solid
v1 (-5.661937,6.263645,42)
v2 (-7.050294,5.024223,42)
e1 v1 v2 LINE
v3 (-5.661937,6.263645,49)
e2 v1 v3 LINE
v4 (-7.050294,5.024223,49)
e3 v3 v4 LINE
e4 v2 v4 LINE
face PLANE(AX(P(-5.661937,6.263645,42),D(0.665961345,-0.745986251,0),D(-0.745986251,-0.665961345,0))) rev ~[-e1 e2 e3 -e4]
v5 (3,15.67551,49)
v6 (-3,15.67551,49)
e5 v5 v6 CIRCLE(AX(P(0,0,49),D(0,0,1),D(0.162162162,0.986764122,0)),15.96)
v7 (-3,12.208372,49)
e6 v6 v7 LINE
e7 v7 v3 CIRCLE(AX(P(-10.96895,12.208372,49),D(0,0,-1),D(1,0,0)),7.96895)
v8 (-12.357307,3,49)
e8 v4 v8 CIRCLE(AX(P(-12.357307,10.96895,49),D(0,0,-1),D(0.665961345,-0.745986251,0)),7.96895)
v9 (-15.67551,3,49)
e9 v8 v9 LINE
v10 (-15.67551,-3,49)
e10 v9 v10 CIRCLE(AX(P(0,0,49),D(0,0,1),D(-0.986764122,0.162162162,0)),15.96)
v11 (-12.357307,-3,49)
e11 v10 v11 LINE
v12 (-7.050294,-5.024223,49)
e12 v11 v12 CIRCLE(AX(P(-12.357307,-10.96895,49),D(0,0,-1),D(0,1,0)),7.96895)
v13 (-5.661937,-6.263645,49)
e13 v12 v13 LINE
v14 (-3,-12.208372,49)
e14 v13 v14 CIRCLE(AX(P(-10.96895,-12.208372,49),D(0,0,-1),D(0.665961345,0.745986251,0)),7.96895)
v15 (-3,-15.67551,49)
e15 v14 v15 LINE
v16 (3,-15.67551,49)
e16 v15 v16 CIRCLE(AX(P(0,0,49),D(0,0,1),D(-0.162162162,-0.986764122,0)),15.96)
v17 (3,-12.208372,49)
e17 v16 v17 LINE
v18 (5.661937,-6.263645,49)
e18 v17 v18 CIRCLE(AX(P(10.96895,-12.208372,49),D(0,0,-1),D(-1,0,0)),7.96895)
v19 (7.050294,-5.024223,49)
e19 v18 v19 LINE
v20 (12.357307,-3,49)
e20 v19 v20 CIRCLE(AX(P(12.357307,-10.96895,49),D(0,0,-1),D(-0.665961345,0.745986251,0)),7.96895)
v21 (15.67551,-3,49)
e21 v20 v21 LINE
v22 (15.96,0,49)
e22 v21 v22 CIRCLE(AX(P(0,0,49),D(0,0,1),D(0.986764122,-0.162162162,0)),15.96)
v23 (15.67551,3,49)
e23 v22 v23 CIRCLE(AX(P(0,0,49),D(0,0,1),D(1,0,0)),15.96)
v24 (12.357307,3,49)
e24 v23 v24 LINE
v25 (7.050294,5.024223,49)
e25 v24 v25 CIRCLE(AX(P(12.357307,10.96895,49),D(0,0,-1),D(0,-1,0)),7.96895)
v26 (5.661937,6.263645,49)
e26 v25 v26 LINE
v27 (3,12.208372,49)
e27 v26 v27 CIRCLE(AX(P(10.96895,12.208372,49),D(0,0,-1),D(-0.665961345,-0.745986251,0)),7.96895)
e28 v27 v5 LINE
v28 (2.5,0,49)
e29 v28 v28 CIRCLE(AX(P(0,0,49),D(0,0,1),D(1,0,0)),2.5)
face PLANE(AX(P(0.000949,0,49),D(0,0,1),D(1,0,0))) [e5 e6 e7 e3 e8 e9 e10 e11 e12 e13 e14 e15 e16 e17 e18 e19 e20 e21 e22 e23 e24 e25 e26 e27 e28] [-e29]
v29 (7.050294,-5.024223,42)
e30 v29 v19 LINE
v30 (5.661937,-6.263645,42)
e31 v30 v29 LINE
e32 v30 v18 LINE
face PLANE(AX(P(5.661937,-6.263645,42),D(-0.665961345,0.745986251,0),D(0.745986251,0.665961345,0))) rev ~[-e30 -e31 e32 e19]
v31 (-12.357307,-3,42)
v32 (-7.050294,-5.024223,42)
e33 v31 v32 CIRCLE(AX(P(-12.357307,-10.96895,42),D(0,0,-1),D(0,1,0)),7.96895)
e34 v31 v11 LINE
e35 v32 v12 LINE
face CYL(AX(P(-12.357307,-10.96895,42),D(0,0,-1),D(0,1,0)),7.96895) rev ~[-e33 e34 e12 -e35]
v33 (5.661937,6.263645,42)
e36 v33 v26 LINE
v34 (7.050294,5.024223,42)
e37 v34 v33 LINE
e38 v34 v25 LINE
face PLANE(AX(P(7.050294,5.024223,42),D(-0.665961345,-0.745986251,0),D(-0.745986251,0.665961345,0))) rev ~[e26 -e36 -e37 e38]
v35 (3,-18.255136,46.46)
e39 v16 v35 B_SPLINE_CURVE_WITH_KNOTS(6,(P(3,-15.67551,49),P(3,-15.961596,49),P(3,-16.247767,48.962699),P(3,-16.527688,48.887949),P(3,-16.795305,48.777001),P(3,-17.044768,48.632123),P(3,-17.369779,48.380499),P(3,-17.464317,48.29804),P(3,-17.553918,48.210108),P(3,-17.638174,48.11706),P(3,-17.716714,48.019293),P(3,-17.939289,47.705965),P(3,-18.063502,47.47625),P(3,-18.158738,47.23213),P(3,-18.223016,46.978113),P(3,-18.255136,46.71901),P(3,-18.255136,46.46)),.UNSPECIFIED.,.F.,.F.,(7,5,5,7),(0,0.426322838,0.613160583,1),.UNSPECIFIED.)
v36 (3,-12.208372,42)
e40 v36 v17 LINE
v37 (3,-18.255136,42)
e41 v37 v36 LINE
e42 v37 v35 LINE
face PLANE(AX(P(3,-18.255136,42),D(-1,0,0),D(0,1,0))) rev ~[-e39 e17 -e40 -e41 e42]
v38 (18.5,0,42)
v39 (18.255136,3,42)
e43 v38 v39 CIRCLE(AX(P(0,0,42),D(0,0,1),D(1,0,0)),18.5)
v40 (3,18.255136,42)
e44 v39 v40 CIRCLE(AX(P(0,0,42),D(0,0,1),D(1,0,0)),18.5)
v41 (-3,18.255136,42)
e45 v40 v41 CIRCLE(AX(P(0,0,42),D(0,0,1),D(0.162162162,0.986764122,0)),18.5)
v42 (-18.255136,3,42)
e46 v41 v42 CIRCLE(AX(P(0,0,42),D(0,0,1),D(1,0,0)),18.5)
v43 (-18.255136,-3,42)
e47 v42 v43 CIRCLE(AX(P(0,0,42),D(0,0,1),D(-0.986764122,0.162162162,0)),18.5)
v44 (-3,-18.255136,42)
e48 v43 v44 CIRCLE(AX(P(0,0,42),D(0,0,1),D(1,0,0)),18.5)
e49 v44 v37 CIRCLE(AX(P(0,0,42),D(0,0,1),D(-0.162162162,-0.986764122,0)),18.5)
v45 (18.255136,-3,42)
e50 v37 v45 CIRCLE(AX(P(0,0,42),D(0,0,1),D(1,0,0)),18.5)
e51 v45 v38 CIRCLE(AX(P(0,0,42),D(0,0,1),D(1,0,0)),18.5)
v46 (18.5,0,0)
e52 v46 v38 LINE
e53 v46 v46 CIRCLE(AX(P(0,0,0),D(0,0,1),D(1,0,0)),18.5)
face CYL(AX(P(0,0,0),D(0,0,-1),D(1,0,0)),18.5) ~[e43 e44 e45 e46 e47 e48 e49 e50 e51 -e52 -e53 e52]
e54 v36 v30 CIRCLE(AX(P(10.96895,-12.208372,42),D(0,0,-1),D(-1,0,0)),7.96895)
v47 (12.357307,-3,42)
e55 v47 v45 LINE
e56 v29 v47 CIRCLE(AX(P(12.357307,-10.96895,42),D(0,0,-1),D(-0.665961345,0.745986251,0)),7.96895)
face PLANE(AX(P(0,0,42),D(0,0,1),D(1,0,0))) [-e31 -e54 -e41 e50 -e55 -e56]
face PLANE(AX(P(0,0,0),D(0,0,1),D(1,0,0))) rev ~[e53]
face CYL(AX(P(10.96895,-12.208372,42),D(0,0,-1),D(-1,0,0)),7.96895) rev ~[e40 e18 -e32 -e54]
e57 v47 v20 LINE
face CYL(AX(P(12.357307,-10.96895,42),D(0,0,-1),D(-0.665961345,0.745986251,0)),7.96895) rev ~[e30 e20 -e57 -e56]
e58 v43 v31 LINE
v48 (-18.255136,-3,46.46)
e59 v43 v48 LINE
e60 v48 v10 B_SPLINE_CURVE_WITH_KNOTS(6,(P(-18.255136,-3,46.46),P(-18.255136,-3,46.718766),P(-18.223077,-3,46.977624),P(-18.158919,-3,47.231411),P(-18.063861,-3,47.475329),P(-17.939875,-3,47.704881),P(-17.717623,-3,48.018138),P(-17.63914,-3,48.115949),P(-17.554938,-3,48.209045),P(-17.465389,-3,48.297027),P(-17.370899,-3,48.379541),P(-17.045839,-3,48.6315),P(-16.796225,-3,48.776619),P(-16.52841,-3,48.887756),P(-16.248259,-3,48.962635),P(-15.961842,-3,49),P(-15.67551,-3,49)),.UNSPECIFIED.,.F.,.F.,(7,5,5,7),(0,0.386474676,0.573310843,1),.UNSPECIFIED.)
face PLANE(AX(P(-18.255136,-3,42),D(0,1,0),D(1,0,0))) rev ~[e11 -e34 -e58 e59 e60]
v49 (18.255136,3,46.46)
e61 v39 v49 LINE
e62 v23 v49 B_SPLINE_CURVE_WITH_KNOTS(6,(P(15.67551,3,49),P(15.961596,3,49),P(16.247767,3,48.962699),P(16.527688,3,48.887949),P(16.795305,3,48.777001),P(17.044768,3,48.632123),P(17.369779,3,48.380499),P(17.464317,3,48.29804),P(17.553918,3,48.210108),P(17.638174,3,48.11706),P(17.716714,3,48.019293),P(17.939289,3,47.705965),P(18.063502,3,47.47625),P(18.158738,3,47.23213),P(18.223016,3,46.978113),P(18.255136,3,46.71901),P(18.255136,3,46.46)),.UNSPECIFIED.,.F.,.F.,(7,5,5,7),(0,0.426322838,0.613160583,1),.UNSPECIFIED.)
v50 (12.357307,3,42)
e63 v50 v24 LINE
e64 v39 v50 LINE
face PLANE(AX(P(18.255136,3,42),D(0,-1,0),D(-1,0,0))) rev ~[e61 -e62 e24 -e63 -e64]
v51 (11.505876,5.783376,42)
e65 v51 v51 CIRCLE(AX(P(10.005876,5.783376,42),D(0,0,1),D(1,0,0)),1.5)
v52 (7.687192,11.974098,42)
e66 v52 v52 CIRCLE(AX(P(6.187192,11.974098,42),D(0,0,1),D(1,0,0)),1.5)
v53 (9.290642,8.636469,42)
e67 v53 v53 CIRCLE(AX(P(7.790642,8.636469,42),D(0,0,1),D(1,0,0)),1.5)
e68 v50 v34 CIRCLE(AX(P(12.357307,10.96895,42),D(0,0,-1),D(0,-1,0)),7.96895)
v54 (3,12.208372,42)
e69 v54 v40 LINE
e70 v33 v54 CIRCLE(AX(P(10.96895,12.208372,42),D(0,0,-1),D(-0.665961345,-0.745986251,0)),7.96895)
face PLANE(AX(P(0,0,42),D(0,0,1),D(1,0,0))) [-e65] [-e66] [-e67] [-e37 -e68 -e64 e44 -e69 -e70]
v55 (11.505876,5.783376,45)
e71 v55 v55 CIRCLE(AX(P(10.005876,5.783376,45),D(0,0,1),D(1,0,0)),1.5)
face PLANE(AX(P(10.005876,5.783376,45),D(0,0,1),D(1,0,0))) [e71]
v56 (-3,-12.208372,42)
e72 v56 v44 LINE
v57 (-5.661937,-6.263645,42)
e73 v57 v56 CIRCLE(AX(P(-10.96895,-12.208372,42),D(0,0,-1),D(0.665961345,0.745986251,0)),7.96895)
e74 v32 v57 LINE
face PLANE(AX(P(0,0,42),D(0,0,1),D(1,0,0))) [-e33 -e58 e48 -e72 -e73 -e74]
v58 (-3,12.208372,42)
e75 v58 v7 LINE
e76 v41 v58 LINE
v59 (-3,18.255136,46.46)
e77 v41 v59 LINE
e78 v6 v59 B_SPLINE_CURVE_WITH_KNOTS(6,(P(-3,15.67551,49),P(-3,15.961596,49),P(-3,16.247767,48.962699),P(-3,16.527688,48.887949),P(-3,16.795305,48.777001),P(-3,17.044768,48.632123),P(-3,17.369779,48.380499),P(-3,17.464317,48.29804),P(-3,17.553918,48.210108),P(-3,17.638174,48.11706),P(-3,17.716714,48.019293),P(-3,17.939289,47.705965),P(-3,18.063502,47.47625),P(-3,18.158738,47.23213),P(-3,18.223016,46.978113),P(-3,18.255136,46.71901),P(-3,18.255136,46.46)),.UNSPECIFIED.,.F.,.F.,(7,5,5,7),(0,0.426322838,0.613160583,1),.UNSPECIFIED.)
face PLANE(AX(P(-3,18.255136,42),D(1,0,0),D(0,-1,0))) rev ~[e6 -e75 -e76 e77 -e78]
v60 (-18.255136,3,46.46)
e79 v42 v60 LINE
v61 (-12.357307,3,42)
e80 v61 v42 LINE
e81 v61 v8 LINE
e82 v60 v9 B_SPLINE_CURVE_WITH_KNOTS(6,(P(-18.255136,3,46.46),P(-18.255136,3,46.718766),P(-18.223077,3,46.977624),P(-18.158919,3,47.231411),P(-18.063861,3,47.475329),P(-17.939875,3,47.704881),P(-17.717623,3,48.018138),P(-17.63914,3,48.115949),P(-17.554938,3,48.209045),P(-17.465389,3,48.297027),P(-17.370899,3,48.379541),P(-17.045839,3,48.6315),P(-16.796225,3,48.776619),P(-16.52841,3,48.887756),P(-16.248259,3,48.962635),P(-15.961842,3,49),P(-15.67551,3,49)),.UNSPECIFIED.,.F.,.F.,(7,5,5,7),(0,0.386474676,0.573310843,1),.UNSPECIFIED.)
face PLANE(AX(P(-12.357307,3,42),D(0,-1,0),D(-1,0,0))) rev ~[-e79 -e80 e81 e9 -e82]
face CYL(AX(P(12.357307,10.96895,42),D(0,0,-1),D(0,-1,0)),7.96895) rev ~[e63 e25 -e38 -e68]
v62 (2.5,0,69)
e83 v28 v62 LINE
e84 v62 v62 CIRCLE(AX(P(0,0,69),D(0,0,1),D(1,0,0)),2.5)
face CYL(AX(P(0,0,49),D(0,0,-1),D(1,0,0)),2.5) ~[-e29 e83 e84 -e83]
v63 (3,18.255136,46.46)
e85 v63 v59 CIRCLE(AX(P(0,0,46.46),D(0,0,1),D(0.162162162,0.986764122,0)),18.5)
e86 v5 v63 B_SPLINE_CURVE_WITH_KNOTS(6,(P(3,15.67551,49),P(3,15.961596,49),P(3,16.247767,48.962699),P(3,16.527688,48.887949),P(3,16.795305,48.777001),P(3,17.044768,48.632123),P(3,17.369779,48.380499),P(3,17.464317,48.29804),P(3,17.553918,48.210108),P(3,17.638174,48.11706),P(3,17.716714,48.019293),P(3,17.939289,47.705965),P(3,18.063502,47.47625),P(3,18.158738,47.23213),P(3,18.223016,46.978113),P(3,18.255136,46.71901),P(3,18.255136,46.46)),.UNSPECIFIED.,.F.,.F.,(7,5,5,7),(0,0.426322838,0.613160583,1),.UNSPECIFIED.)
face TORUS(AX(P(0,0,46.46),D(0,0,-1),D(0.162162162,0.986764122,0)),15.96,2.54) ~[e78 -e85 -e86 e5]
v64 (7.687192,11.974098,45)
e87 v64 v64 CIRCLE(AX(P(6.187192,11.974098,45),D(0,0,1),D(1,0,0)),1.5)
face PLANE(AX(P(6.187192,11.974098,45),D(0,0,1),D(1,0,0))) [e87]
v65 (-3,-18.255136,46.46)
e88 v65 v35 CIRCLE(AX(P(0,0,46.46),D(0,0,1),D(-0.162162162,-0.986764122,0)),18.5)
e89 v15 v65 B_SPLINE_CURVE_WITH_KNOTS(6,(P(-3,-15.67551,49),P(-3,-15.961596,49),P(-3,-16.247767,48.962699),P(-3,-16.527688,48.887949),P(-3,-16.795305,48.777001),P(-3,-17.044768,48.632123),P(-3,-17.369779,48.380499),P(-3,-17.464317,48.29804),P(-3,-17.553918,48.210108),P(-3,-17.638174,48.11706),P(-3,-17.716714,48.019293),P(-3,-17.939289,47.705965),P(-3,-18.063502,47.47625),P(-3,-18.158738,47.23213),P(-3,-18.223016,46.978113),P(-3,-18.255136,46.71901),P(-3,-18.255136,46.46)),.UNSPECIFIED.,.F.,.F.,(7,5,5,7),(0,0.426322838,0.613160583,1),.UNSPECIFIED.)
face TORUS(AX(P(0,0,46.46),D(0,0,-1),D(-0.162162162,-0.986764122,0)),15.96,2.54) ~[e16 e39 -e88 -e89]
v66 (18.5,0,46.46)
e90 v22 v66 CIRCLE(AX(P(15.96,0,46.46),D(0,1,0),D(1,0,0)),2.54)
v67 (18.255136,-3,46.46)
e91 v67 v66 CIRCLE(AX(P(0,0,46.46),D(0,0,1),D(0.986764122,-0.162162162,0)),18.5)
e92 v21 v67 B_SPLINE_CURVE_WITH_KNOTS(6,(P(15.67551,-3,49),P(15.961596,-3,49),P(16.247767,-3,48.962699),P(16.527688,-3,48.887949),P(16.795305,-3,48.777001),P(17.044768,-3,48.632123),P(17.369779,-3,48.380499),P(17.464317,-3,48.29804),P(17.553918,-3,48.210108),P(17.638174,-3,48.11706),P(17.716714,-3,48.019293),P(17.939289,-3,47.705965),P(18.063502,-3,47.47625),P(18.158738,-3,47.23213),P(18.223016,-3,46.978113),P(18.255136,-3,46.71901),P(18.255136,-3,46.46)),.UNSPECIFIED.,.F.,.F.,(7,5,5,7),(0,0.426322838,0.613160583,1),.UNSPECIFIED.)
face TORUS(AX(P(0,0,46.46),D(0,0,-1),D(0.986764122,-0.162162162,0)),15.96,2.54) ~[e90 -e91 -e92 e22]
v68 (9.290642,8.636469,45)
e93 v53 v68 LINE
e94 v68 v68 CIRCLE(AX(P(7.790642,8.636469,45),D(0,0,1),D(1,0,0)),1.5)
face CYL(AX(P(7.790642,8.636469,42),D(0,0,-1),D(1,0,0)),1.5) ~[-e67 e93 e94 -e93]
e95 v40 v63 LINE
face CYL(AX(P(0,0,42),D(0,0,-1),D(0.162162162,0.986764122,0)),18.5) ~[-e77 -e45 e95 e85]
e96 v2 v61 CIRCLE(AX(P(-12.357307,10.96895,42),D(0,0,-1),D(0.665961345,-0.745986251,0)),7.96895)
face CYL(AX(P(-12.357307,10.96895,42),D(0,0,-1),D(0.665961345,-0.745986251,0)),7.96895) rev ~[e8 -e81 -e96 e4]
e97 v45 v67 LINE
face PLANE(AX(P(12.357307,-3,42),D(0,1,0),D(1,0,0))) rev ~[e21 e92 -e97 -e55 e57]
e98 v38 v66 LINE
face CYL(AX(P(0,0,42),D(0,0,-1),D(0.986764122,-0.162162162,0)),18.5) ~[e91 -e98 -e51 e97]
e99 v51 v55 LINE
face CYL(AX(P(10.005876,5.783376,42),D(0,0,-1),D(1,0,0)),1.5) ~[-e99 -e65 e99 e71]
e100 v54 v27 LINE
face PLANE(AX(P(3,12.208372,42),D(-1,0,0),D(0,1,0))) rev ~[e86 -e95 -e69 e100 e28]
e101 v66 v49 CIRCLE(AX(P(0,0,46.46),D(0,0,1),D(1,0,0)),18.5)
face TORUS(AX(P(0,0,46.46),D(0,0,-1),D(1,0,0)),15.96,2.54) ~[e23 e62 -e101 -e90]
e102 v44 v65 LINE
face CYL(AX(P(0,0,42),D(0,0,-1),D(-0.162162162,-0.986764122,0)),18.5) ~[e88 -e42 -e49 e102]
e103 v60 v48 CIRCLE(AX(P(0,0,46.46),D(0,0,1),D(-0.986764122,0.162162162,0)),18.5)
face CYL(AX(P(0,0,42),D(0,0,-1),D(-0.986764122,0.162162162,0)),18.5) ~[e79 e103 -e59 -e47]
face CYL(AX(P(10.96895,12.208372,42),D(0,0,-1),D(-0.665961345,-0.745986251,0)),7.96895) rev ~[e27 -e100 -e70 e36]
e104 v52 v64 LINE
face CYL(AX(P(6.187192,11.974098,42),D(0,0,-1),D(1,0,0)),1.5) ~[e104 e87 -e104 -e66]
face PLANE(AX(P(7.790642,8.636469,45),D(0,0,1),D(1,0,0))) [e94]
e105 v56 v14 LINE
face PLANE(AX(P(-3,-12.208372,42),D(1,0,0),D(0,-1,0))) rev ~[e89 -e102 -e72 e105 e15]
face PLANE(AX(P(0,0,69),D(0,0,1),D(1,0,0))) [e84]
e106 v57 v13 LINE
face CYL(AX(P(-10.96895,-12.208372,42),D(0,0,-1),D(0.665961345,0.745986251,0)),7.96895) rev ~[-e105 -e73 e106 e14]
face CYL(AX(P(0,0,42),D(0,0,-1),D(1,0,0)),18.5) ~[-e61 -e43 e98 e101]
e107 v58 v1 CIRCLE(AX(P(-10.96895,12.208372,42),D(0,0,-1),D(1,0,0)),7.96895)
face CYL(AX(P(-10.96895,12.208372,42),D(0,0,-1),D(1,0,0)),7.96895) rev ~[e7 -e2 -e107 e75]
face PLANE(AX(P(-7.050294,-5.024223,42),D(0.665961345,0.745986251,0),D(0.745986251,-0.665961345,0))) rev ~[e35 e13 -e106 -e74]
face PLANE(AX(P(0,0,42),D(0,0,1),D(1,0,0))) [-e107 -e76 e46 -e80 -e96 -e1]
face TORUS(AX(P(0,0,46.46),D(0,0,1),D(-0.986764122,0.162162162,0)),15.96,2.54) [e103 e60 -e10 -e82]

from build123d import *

# Parameters (mm, degrees)
F0_R     = 18.5
F1_DEPTH = 42
F3_DEPTH = 7
F4_R     = 2.54
F5_R     = 2.5
F6_DEPTH = 20
F8_R     = 1.5
F7_R     = 1.5
F9_DEPTH = 3


with BuildPart() as f1:
    # F0 (on Top) → F1 (new body)
    with BuildSketch(Plane.XY):
        Circle(F0_R)
    extrude(amount=F1_DEPTH)

    # F2 (on face) → F3 (join)
    with BuildSketch(Plane.XY.offset(42)):
        with BuildLine():
            ThreePointArc((-18.2551362635, 3), (-18.5, 0), (-18.2551362635, -3))
            Line((-18.2551362635, -3), (-12.357306623, -3))
            ThreePointArc((-12.357306623, -3), (-9.5173301957, -3.5232332201), (-7.0502937278, -5.0242229525))
            Line((-7.0502937278, -5.0242229525), (-5.6619374598, -6.2636447322))
            ThreePointArc((-5.6619374598, -6.2636447322), (-3.695866688, -8.9516216481), (-3, -12.2083721348))
            Line((-3, -12.2083721348), (-3, -18.2551362635))
            ThreePointArc((-3, -18.2551362635), (0, -18.5), (3, -18.2551362635))
            Line((3, -18.2551362635), (3, -12.2083721348))
            ThreePointArc((3, -12.2083721348), (3.695866688, -8.9516216481), (5.6619374598, -6.2636447322))
            Line((5.6619374598, -6.2636447322), (7.0502937278, -5.0242229525))
            ThreePointArc((7.0502937278, -5.0242229525), (9.5173301957, -3.5232332201), (12.357306623, -3))
            Line((12.357306623, -3), (18.2551362635, -3))
            ThreePointArc((18.2551362635, -3), (18.4386824485, -1.5049882267), (18.5, 0))
            ThreePointArc((18.5, 0), (18.4386824485, 1.5049882267), (18.2551362635, 3))
            Line((18.2551362635, 3), (12.357306623, 3))
            ThreePointArc((12.357306623, 3), (9.5173301957, 3.5232332201), (7.0502937278, 5.0242229525))
            Line((7.0502937278, 5.0242229525), (5.6619374598, 6.2636447322))
            ThreePointArc((5.6619374598, 6.2636447322), (3.695866688, 8.9516216481), (3, 12.2083721348))
            Line((3, 12.2083721348), (3, 18.2551362635))
            ThreePointArc((3, 18.2551362635), (0, 18.5), (-3, 18.2551362635))
            Line((-3, 18.2551362635), (-3, 12.2083721348))
            ThreePointArc((-3, 12.2083721348), (-3.695866688, 8.9516216481), (-5.6619374598, 6.2636447322))
            Line((-5.6619374598, 6.2636447322), (-7.0502937278, 5.0242229525))
            ThreePointArc((-7.0502937278, 5.0242229525), (-9.5173301957, 3.5232332201), (-12.357306623, 3))
            Line((-12.357306623, 3), (-18.2551362635, 3))
        make_face()
    extrude(amount=F3_DEPTH)

    # F4
    f4_edges = [f1.edges().sort_by_distance(p)[0] for p in [
        (0, 18.5, 49),
        (-18.5, 0, 49),
        (0, -18.5, 49),
        (18.5, 0, 49),
    ]]
    fillet(f4_edges, radius=F4_R)

    # F5 (on face) → F6 (join)
    with BuildSketch(Plane.XY.offset(49)):
        Circle(F5_R)
    extrude(amount=F6_DEPTH)

    # F8 (on face) + F7 (on face) → F9 (join)
    with BuildSketch(Plane.XY.offset(42)):
        with Locations((6.1871920723, 11.9740978757)):
            Circle(F8_R)
    with BuildSketch(Plane.XY.offset(42)):
        with Locations((7.7906422209, 8.6364694748)):
            Circle(F7_R)
        with Locations((10.0058761309, 5.7833763727)):
            Circle(F7_R)
    extrude(amount=F9_DEPTH)


solid = f1.part
